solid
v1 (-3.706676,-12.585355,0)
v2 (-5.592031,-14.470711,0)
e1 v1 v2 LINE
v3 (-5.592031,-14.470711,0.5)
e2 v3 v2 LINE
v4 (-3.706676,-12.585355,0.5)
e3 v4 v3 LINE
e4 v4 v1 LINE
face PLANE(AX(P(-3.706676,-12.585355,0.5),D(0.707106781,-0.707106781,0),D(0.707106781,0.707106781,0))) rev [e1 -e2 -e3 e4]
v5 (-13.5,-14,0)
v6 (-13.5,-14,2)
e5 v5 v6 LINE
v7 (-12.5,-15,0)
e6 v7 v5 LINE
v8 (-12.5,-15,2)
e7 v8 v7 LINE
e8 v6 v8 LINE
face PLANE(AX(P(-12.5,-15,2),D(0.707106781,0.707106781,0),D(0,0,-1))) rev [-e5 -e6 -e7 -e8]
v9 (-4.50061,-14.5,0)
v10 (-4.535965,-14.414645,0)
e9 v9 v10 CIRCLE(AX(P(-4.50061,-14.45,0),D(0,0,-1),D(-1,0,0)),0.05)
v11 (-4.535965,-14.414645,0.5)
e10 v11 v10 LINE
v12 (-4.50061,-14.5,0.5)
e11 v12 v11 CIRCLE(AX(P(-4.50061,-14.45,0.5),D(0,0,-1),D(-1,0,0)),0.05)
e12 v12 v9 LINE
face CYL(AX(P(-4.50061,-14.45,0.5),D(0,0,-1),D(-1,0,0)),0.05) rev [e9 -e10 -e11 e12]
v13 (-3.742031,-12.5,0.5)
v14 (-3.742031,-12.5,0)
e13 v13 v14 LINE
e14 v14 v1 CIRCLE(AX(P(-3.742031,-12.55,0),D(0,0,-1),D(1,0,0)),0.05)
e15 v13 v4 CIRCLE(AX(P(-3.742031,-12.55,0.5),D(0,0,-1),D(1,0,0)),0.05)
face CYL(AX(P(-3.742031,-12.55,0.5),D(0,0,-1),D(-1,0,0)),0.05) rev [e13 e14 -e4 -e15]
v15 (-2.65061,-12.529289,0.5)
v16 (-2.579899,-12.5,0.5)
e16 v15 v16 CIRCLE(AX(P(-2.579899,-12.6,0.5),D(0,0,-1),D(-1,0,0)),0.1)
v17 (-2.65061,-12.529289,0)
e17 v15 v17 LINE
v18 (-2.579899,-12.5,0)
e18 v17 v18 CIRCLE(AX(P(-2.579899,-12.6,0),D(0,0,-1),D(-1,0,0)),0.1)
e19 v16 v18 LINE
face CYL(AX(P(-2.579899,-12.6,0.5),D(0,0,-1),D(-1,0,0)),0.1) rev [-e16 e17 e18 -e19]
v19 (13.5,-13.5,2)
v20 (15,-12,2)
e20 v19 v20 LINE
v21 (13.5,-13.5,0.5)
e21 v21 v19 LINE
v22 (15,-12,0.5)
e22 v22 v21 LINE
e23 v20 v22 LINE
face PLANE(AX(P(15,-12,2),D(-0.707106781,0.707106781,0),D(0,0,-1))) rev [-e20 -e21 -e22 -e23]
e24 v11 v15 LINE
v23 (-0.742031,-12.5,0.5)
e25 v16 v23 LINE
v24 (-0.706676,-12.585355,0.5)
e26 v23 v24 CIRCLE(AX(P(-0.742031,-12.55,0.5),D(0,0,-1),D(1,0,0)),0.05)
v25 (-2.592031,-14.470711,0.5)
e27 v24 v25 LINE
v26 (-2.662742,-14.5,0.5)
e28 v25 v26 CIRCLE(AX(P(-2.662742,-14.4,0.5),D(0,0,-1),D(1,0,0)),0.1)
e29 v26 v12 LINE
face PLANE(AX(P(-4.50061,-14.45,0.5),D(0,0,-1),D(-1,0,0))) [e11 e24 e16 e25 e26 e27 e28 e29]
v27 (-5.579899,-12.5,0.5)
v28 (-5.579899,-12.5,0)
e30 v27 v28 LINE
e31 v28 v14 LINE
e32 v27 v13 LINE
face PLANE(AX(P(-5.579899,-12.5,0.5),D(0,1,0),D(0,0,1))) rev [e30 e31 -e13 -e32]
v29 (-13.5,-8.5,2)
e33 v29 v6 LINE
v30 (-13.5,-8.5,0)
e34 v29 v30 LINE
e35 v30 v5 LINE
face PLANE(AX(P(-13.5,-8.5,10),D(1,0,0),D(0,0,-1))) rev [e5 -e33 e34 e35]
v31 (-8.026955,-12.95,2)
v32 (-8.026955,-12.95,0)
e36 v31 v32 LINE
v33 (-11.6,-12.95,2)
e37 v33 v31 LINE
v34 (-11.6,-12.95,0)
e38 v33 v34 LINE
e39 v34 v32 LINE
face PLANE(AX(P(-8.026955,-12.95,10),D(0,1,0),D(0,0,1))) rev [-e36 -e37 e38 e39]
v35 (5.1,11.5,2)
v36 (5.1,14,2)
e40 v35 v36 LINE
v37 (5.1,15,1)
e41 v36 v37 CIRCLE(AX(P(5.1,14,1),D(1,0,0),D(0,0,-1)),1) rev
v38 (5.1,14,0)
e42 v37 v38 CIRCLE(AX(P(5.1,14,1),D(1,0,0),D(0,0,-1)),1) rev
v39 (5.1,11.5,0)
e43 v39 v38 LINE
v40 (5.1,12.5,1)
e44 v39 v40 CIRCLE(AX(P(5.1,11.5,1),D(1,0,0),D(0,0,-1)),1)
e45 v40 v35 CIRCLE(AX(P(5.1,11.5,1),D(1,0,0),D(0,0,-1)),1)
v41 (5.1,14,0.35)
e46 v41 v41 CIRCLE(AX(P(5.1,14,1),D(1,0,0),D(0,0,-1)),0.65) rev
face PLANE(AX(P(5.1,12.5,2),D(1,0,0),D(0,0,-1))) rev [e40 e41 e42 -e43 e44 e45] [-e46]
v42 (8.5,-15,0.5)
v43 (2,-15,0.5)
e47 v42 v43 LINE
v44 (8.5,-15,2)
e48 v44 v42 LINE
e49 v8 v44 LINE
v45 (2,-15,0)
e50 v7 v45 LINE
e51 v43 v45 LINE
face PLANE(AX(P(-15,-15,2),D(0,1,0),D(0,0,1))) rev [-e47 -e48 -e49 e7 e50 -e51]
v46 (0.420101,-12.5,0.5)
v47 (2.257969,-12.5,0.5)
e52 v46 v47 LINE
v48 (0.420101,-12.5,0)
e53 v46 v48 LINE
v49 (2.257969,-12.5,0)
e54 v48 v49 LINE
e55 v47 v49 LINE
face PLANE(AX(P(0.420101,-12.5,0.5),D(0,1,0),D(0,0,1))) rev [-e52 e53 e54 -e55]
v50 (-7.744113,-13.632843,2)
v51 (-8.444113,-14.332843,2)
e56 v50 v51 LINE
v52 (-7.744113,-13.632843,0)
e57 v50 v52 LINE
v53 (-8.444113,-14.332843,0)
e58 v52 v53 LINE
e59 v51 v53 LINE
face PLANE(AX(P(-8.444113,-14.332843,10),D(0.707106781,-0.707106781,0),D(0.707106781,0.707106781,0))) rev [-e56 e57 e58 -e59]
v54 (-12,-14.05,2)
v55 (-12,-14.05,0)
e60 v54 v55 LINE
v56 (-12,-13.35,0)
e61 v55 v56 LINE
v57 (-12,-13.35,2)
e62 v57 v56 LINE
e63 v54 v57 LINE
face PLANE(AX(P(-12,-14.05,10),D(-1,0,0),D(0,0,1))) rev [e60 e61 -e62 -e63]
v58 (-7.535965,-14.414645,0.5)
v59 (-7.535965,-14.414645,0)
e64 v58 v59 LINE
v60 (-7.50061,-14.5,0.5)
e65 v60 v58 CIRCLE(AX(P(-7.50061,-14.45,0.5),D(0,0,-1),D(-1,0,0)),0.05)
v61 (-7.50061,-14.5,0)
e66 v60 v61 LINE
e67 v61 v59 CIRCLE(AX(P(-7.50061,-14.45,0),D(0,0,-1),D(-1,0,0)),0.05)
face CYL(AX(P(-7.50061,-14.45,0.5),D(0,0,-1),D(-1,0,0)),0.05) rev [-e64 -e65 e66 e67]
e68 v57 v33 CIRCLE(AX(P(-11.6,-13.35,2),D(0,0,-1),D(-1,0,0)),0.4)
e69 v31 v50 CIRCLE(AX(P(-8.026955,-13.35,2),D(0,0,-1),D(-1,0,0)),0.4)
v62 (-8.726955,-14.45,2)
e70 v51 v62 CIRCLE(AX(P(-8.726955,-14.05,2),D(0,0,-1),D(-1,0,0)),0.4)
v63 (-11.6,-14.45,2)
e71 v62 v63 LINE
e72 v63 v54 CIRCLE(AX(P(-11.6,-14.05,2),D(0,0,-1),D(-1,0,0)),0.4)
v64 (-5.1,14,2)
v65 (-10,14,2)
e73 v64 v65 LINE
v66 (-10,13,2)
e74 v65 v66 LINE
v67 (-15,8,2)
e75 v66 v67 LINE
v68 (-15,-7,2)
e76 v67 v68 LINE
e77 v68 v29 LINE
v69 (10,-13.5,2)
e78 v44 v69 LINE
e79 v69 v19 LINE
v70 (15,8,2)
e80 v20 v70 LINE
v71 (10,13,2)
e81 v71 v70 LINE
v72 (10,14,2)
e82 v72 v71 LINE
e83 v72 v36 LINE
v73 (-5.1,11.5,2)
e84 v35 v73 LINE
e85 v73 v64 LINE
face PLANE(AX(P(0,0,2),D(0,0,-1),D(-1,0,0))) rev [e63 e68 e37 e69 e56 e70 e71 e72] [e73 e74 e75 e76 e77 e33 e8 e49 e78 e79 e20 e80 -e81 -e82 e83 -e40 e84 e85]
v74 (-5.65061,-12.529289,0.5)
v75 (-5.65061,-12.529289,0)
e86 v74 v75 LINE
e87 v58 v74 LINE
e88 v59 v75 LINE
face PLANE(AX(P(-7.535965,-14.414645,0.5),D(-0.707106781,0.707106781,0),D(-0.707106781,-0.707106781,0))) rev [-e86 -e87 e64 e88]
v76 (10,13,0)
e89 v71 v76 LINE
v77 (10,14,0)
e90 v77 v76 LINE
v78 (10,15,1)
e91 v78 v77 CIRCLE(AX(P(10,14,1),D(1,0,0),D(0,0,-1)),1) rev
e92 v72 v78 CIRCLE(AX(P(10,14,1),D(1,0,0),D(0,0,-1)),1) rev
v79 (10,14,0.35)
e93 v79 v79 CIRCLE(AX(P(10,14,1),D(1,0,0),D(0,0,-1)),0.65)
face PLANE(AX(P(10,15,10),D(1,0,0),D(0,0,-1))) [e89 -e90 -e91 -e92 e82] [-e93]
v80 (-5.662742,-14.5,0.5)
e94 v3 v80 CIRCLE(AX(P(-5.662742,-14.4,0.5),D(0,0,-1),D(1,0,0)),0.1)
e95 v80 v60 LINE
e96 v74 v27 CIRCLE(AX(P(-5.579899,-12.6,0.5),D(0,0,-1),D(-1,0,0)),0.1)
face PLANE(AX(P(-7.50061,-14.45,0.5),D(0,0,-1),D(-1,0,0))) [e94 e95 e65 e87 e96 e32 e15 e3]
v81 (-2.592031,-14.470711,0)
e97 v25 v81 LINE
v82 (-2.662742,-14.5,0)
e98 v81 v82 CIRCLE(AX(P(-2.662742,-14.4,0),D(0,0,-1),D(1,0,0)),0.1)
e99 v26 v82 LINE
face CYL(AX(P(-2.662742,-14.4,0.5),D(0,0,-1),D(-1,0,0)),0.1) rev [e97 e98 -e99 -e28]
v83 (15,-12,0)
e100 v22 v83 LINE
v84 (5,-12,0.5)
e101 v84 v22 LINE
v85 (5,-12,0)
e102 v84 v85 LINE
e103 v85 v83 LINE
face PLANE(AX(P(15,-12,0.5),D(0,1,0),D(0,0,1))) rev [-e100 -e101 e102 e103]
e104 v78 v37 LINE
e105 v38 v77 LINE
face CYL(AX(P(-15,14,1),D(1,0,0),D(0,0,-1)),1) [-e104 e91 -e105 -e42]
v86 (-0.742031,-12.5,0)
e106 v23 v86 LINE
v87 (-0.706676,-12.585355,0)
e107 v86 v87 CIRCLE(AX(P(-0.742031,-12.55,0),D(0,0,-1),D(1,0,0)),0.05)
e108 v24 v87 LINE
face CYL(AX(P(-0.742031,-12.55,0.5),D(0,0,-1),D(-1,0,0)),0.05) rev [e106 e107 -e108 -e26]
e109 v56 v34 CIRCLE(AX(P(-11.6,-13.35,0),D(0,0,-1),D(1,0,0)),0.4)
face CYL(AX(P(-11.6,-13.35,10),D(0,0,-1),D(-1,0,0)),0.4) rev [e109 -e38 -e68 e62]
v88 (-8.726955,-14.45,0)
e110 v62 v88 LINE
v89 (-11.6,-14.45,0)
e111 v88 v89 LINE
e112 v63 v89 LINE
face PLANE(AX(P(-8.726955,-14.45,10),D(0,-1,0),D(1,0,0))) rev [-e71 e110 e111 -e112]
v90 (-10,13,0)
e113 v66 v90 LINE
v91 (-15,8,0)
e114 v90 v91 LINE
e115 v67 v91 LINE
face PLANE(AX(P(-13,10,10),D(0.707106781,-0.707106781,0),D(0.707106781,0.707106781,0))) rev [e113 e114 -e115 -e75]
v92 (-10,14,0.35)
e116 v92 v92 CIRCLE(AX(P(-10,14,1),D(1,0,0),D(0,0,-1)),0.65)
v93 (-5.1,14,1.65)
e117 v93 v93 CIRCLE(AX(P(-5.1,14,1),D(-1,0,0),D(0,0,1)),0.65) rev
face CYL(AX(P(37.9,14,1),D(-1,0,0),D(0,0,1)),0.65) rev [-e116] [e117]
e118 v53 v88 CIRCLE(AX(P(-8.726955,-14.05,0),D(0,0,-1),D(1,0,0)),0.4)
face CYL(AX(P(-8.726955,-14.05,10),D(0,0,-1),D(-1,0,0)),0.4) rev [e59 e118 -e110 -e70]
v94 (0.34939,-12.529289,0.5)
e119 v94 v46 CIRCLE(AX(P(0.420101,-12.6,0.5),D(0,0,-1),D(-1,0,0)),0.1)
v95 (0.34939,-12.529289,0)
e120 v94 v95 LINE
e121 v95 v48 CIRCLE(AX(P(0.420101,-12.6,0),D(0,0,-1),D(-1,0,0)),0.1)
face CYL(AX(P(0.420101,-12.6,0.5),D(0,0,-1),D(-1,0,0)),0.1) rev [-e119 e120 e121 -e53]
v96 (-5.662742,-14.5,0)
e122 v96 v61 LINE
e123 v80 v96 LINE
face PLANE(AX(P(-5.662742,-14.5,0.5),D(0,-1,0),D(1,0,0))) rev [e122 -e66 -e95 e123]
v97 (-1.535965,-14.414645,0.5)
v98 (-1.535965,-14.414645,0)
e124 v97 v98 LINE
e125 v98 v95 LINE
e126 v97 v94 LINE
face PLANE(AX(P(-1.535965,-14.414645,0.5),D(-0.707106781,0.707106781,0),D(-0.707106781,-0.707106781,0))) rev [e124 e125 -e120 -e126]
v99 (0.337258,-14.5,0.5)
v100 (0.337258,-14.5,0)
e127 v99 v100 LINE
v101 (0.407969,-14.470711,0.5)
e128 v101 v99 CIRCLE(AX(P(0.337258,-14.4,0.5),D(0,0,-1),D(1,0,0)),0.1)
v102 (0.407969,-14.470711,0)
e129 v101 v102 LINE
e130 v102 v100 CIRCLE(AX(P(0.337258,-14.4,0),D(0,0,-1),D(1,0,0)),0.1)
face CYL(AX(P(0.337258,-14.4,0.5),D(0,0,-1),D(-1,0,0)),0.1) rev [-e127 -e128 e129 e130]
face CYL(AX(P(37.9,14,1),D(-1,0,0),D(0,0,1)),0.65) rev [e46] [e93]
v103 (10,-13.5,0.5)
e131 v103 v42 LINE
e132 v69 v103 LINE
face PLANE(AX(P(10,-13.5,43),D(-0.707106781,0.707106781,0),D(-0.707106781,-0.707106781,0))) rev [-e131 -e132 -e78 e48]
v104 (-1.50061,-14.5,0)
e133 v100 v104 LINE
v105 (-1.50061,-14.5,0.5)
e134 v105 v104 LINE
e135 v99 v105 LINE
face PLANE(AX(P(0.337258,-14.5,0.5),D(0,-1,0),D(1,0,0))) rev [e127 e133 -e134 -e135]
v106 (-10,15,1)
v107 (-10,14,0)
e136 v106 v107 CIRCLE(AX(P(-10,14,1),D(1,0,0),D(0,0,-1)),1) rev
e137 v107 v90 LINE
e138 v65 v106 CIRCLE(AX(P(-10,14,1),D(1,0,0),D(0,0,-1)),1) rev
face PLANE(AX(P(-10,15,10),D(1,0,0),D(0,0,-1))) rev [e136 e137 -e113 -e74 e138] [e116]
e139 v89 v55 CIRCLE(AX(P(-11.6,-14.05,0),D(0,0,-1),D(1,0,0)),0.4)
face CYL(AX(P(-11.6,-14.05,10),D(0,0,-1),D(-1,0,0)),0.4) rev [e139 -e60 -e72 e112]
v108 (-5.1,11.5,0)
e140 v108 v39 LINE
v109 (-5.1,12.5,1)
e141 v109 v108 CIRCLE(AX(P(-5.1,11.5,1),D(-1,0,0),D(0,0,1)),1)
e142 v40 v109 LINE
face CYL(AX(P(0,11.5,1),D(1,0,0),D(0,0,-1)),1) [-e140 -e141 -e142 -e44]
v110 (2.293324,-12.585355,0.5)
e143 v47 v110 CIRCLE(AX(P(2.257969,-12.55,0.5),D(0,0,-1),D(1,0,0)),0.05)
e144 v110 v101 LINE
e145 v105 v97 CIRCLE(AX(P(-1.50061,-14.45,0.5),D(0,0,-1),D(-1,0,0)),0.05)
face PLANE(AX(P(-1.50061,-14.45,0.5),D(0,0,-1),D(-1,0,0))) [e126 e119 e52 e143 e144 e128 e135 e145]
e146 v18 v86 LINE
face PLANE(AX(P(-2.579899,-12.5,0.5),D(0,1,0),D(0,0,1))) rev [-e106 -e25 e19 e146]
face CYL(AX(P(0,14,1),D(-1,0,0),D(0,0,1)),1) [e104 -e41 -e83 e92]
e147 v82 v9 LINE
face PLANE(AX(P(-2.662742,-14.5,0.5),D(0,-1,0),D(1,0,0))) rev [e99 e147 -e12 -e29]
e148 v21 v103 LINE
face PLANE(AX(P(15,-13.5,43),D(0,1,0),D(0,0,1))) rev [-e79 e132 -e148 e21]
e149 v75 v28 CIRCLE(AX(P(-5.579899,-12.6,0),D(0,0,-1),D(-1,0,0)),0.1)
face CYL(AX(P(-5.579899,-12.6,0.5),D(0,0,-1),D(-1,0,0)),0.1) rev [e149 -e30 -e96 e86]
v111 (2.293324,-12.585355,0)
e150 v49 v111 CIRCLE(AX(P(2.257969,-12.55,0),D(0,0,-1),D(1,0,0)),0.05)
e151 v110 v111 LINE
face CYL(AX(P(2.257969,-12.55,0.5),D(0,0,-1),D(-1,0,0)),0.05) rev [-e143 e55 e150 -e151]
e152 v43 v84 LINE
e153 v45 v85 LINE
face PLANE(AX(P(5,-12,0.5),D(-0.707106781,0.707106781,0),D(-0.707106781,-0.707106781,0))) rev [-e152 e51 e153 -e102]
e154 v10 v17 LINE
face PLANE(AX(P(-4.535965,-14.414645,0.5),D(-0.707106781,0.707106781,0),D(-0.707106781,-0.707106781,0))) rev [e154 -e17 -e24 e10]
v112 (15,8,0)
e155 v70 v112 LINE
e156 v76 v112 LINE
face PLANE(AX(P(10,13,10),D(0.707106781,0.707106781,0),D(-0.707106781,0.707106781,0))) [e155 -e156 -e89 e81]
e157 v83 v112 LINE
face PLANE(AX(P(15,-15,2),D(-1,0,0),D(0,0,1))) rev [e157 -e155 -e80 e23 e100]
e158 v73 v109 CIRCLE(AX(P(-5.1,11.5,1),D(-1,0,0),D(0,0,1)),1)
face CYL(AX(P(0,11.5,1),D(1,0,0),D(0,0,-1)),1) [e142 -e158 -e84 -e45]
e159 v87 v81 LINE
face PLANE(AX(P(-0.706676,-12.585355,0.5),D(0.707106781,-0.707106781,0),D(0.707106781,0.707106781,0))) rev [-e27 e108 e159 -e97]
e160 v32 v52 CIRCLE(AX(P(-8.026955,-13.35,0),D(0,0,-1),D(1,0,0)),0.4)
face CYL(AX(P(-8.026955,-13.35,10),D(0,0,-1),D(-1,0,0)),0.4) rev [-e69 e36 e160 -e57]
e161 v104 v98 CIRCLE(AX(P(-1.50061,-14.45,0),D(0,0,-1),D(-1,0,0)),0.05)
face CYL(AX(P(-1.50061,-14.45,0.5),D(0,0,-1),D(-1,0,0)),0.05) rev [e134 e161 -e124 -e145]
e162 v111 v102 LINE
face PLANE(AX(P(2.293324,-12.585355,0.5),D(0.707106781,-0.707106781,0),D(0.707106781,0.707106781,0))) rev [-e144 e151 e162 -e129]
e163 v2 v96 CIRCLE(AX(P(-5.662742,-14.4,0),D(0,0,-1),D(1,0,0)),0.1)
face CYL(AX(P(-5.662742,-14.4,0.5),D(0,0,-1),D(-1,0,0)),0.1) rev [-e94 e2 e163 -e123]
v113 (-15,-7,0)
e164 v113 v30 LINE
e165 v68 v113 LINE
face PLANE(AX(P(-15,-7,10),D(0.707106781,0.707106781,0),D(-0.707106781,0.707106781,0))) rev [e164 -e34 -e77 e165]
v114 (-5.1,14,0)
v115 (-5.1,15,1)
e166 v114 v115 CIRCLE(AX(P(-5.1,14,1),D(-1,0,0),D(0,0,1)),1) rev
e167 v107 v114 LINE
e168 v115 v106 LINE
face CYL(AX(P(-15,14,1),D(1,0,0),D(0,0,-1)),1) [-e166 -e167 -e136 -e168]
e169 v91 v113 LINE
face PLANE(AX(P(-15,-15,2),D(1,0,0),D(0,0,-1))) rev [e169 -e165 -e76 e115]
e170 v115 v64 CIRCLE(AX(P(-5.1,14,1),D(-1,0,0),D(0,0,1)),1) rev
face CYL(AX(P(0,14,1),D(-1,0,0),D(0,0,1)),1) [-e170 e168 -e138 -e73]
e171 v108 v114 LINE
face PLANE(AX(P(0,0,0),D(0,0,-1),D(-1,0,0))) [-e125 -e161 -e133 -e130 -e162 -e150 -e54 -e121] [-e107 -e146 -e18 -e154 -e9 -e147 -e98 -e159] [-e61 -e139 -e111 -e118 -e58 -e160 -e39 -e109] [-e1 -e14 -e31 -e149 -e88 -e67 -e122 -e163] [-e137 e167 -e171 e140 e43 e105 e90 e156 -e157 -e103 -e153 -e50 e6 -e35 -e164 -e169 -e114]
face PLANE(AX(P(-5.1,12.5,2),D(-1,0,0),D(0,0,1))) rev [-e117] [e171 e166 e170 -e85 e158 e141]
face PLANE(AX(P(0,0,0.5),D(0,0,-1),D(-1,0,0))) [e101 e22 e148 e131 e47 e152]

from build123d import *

# Parameters (mm, degrees)
SKETCH_1_W               = 30
SKETCH_1_H               = 30
EXTRUDE_1_DEPTH          = 2
SKETCH_2_W               = 10.2
SKETCH_2_H               = 2
CUT_EXTRUDE_1_DEPTH      = 2.5
CUT_EXTRUDE_3_DEPTH      = 43
CHAMFER_1_SIZE           = 1.5
CUT_EXTRUDE_4_DEPTH      = 0.5
FILLET_1_R               = 1
CUT_EXTRUDE_2_DEPTH      = 43
CUT_EXTRUDE_2_DEPTH_BACK = 43
SKETCH_3_R               = 0.65
CUT_EXTRUDE_7_DEPTH      = 0.5
CUT_EXTRUDE_8_DEPTH      = 10
CUT_EXTRUDE_9_DEPTH      = 10
CHAMFER_2_SIZE           = 1
CUT_EXTRUDE_10_DEPTH     = 10


with BuildPart() as part:
    # 草图1 → 凸台-拉伸1 (new body)
    with BuildSketch(Plane.XY):
        Rectangle(SKETCH_1_W, SKETCH_1_H)
    extrude(amount=EXTRUDE_1_DEPTH)

    # 草图2 → 切除-拉伸1 (cut)
    with BuildSketch(Plane(origin=(0, 15, 0), x_dir=(1, 0, 0), z_dir=(0, 1, 0))):
        with Locations((0, -1)):
            Rectangle(SKETCH_2_W, SKETCH_2_H)
    extrude(amount=-CUT_EXTRUDE_1_DEPTH, mode=Mode.SUBTRACT)

    # 草图4 → 切除-拉伸3 (cut)
    with BuildSketch(Plane(origin=(0, 0, 0), x_dir=(-1, 0, 0), z_dir=(0, 0, -1))):
        Polygon((-10, -13.5), (-8.5, -15), (-10, -15), (-15, -15), (-15, -13.5), align=None)
    extrude(amount=-CUT_EXTRUDE_3_DEPTH, mode=Mode.SUBTRACT)

    # 倒角1
    chamfer_1_edges = [part.edges().sort_by_distance(p)[0] for p in [
        (15, -13.5, 1),
    ]]
    chamfer(chamfer_1_edges, length=CHAMFER_1_SIZE)

    # 草图5 → 切除-拉伸4 (cut)
    with BuildSketch(Plane(origin=(0, 0, 0), x_dir=(-1, 0, 0), z_dir=(0, 0, -1))):
        Polygon((-15, -12), (-5, -12), (-2, -15), (-8.5, -15), (-10, -13.5), (-13.5, -13.5), align=None)
    extrude(amount=-CUT_EXTRUDE_4_DEPTH, mode=Mode.SUBTRACT)

    # 圆角1
    fillet_1_edges = [part.edges().sort_by_distance(p)[0] for p in [
        (10.05, 15, 2),
        (10.05, 15, 0),
        (-10.05, 15, 2),
        (-10.05, 15, 0),
        (0, 12.5, 2),
        (0, 12.5, 0),
    ]]
    fillet(fillet_1_edges, radius=FILLET_1_R - 0.0001)  # a hair under: the kernel refuses the full size

    # 草图3 → 切除-拉伸2 (cut, two sides: drawn at the far end of the back side and taken through both)
    with BuildSketch(Plane(origin=(-5.1, 0, 0), x_dir=(0, 0, -1), z_dir=(1, 0, 0)).offset(-CUT_EXTRUDE_2_DEPTH_BACK)):
        with Locations(Location((-1, 14, 0), (0, 0, 180))):
            Circle(SKETCH_3_R)
    extrude(amount=CUT_EXTRUDE_2_DEPTH + CUT_EXTRUDE_2_DEPTH_BACK, mode=Mode.SUBTRACT)

    # 草图9 → 切除-拉伸7 (cut)
    with BuildSketch(Plane(origin=(0, 0, 0), x_dir=(-1, 0, 0), z_dir=(0, 0, -1))):
        with BuildLine():
            Line((-2.293324317, -12.585355339), (-0.407968978, -14.470710678))
            ThreePointArc((-0.407968978, -14.470710678), (-0.375526643, -14.492387953), (-0.3372583, -14.5))
            Line((-0.3372583, -14.5), (1.500609665, -14.5))
            ThreePointArc((1.500609665, -14.5), (1.546803642, -14.469134172), (1.535965005, -14.414644661))
            Line((1.535965005, -14.414644661), (-0.349390335, -12.529289322))
            ThreePointArc((-0.349390335, -12.529289322), (-0.381832669, -12.507612047), (-0.420101013, -12.5))
            Line((-0.420101013, -12.5), (-2.257968978, -12.5))
            ThreePointArc((-2.257968978, -12.5), (-2.304162955, -12.530865828), (-2.293324317, -12.585355339))
        make_face()
        with BuildLine():
            Line((2.579898987, -12.5), (0.742031022, -12.5))
            ThreePointArc((0.742031022, -12.5), (0.695837045, -12.530865828), (0.706675683, -12.585355339))
            Line((0.706675683, -12.585355339), (2.592031022, -14.470710678))
            ThreePointArc((2.592031022, -14.470710678), (2.624473357, -14.492387953), (2.6627417, -14.5))
            Line((2.6627417, -14.5), (4.500609665, -14.5))
            ThreePointArc((4.500609665, -14.5), (4.546803642, -14.469134172), (4.535965005, -14.414644661))
            Line((4.535965005, -14.414644661), (2.650609665, -12.529289322))
            ThreePointArc((2.650609665, -12.529289322), (2.618167331, -12.507612047), (2.579898987, -12.5))
        make_face()
        with BuildLine():
            Line((5.579898987, -12.5), (3.742031022, -12.5))
            ThreePointArc((3.742031022, -12.5), (3.695837045, -12.530865828), (3.706675683, -12.585355339))
            Line((3.706675683, -12.585355339), (5.592031022, -14.470710678))
            ThreePointArc((5.592031022, -14.470710678), (5.624473357, -14.492387953), (5.6627417, -14.5))
            Line((5.6627417, -14.5), (7.500609665, -14.5))
            ThreePointArc((7.500609665, -14.5), (7.546803642, -14.469134172), (7.535965005, -14.414644661))
            Line((7.535965005, -14.414644661), (5.650609665, -12.529289322))
            ThreePointArc((5.650609665, -12.529289322), (5.618167331, -12.507612047), (5.579898987, -12.5))
        make_face()
    extrude(amount=-CUT_EXTRUDE_7_DEPTH, mode=Mode.SUBTRACT)

    # 草图10 → 切除-拉伸8 (cut)
    with BuildSketch(Plane(origin=(0, 0, 0), x_dir=(-1, 0, 0), z_dir=(0, 0, -1))):
        with BuildLine():
            Line((8.026955262, -12.95), (11.6, -12.95))
            ThreePointArc((11.6, -12.95), (11.882842712, -13.067157288), (12, -13.35))
            Line((12, -13.35), (12, -14.05))
            ThreePointArc((12, -14.05), (11.882842712, -14.332842712), (11.6, -14.45))
            Line((11.6, -14.45), (8.726955262, -14.45))
            ThreePointArc((8.726955262, -14.45), (8.573881889, -14.419551813), (8.44411255, -14.332842712))
            Line((8.44411255, -14.332842712), (7.74411255, -13.632842712))
            ThreePointArc((7.74411255, -13.632842712), (7.657403449, -13.196926627), (8.026955262, -12.95))
        make_face()
    extrude(amount=-CUT_EXTRUDE_8_DEPTH, mode=Mode.SUBTRACT)

    # 草图11 → 切除-拉伸9 (cut)
    with BuildSketch(Plane(origin=(0, 0, 0), x_dir=(-1, 0, 0), z_dir=(0, 0, -1))):
        Polygon((15, -7), (13.5, -8.5), (13.5, -15), (15, -15), align=None)
    extrude(amount=-CUT_EXTRUDE_9_DEPTH, mode=Mode.SUBTRACT)

    # 倒角2
    chamfer_2_edges = [part.edges().sort_by_distance(p)[0] for p in [
        (-13.5, -15, 1),
    ]]
    chamfer(chamfer_2_edges, length=CHAMFER_2_SIZE)

    # 草图12 → 切除-拉伸10 (cut)
    with BuildSketch(Plane(origin=(0, 0, 0), x_dir=(-1, 0, 0), z_dir=(0, 0, -1))):
        Polygon((10, 15), (10, 13), (13, 10), (15, 8), (15, 15), align=None)
    cut_extrude_10 = extrude(amount=-CUT_EXTRUDE_10_DEPTH, mode=Mode.SUBTRACT)

    # 镜向4: 切除-拉伸10 across plane
    add(cut_extrude_10.mirror(Plane(origin=(0, 0, 0), x_dir=(0, 0, 1), z_dir=(1, 0, 0))), mode=Mode.SUBTRACT)


solid = part.part
